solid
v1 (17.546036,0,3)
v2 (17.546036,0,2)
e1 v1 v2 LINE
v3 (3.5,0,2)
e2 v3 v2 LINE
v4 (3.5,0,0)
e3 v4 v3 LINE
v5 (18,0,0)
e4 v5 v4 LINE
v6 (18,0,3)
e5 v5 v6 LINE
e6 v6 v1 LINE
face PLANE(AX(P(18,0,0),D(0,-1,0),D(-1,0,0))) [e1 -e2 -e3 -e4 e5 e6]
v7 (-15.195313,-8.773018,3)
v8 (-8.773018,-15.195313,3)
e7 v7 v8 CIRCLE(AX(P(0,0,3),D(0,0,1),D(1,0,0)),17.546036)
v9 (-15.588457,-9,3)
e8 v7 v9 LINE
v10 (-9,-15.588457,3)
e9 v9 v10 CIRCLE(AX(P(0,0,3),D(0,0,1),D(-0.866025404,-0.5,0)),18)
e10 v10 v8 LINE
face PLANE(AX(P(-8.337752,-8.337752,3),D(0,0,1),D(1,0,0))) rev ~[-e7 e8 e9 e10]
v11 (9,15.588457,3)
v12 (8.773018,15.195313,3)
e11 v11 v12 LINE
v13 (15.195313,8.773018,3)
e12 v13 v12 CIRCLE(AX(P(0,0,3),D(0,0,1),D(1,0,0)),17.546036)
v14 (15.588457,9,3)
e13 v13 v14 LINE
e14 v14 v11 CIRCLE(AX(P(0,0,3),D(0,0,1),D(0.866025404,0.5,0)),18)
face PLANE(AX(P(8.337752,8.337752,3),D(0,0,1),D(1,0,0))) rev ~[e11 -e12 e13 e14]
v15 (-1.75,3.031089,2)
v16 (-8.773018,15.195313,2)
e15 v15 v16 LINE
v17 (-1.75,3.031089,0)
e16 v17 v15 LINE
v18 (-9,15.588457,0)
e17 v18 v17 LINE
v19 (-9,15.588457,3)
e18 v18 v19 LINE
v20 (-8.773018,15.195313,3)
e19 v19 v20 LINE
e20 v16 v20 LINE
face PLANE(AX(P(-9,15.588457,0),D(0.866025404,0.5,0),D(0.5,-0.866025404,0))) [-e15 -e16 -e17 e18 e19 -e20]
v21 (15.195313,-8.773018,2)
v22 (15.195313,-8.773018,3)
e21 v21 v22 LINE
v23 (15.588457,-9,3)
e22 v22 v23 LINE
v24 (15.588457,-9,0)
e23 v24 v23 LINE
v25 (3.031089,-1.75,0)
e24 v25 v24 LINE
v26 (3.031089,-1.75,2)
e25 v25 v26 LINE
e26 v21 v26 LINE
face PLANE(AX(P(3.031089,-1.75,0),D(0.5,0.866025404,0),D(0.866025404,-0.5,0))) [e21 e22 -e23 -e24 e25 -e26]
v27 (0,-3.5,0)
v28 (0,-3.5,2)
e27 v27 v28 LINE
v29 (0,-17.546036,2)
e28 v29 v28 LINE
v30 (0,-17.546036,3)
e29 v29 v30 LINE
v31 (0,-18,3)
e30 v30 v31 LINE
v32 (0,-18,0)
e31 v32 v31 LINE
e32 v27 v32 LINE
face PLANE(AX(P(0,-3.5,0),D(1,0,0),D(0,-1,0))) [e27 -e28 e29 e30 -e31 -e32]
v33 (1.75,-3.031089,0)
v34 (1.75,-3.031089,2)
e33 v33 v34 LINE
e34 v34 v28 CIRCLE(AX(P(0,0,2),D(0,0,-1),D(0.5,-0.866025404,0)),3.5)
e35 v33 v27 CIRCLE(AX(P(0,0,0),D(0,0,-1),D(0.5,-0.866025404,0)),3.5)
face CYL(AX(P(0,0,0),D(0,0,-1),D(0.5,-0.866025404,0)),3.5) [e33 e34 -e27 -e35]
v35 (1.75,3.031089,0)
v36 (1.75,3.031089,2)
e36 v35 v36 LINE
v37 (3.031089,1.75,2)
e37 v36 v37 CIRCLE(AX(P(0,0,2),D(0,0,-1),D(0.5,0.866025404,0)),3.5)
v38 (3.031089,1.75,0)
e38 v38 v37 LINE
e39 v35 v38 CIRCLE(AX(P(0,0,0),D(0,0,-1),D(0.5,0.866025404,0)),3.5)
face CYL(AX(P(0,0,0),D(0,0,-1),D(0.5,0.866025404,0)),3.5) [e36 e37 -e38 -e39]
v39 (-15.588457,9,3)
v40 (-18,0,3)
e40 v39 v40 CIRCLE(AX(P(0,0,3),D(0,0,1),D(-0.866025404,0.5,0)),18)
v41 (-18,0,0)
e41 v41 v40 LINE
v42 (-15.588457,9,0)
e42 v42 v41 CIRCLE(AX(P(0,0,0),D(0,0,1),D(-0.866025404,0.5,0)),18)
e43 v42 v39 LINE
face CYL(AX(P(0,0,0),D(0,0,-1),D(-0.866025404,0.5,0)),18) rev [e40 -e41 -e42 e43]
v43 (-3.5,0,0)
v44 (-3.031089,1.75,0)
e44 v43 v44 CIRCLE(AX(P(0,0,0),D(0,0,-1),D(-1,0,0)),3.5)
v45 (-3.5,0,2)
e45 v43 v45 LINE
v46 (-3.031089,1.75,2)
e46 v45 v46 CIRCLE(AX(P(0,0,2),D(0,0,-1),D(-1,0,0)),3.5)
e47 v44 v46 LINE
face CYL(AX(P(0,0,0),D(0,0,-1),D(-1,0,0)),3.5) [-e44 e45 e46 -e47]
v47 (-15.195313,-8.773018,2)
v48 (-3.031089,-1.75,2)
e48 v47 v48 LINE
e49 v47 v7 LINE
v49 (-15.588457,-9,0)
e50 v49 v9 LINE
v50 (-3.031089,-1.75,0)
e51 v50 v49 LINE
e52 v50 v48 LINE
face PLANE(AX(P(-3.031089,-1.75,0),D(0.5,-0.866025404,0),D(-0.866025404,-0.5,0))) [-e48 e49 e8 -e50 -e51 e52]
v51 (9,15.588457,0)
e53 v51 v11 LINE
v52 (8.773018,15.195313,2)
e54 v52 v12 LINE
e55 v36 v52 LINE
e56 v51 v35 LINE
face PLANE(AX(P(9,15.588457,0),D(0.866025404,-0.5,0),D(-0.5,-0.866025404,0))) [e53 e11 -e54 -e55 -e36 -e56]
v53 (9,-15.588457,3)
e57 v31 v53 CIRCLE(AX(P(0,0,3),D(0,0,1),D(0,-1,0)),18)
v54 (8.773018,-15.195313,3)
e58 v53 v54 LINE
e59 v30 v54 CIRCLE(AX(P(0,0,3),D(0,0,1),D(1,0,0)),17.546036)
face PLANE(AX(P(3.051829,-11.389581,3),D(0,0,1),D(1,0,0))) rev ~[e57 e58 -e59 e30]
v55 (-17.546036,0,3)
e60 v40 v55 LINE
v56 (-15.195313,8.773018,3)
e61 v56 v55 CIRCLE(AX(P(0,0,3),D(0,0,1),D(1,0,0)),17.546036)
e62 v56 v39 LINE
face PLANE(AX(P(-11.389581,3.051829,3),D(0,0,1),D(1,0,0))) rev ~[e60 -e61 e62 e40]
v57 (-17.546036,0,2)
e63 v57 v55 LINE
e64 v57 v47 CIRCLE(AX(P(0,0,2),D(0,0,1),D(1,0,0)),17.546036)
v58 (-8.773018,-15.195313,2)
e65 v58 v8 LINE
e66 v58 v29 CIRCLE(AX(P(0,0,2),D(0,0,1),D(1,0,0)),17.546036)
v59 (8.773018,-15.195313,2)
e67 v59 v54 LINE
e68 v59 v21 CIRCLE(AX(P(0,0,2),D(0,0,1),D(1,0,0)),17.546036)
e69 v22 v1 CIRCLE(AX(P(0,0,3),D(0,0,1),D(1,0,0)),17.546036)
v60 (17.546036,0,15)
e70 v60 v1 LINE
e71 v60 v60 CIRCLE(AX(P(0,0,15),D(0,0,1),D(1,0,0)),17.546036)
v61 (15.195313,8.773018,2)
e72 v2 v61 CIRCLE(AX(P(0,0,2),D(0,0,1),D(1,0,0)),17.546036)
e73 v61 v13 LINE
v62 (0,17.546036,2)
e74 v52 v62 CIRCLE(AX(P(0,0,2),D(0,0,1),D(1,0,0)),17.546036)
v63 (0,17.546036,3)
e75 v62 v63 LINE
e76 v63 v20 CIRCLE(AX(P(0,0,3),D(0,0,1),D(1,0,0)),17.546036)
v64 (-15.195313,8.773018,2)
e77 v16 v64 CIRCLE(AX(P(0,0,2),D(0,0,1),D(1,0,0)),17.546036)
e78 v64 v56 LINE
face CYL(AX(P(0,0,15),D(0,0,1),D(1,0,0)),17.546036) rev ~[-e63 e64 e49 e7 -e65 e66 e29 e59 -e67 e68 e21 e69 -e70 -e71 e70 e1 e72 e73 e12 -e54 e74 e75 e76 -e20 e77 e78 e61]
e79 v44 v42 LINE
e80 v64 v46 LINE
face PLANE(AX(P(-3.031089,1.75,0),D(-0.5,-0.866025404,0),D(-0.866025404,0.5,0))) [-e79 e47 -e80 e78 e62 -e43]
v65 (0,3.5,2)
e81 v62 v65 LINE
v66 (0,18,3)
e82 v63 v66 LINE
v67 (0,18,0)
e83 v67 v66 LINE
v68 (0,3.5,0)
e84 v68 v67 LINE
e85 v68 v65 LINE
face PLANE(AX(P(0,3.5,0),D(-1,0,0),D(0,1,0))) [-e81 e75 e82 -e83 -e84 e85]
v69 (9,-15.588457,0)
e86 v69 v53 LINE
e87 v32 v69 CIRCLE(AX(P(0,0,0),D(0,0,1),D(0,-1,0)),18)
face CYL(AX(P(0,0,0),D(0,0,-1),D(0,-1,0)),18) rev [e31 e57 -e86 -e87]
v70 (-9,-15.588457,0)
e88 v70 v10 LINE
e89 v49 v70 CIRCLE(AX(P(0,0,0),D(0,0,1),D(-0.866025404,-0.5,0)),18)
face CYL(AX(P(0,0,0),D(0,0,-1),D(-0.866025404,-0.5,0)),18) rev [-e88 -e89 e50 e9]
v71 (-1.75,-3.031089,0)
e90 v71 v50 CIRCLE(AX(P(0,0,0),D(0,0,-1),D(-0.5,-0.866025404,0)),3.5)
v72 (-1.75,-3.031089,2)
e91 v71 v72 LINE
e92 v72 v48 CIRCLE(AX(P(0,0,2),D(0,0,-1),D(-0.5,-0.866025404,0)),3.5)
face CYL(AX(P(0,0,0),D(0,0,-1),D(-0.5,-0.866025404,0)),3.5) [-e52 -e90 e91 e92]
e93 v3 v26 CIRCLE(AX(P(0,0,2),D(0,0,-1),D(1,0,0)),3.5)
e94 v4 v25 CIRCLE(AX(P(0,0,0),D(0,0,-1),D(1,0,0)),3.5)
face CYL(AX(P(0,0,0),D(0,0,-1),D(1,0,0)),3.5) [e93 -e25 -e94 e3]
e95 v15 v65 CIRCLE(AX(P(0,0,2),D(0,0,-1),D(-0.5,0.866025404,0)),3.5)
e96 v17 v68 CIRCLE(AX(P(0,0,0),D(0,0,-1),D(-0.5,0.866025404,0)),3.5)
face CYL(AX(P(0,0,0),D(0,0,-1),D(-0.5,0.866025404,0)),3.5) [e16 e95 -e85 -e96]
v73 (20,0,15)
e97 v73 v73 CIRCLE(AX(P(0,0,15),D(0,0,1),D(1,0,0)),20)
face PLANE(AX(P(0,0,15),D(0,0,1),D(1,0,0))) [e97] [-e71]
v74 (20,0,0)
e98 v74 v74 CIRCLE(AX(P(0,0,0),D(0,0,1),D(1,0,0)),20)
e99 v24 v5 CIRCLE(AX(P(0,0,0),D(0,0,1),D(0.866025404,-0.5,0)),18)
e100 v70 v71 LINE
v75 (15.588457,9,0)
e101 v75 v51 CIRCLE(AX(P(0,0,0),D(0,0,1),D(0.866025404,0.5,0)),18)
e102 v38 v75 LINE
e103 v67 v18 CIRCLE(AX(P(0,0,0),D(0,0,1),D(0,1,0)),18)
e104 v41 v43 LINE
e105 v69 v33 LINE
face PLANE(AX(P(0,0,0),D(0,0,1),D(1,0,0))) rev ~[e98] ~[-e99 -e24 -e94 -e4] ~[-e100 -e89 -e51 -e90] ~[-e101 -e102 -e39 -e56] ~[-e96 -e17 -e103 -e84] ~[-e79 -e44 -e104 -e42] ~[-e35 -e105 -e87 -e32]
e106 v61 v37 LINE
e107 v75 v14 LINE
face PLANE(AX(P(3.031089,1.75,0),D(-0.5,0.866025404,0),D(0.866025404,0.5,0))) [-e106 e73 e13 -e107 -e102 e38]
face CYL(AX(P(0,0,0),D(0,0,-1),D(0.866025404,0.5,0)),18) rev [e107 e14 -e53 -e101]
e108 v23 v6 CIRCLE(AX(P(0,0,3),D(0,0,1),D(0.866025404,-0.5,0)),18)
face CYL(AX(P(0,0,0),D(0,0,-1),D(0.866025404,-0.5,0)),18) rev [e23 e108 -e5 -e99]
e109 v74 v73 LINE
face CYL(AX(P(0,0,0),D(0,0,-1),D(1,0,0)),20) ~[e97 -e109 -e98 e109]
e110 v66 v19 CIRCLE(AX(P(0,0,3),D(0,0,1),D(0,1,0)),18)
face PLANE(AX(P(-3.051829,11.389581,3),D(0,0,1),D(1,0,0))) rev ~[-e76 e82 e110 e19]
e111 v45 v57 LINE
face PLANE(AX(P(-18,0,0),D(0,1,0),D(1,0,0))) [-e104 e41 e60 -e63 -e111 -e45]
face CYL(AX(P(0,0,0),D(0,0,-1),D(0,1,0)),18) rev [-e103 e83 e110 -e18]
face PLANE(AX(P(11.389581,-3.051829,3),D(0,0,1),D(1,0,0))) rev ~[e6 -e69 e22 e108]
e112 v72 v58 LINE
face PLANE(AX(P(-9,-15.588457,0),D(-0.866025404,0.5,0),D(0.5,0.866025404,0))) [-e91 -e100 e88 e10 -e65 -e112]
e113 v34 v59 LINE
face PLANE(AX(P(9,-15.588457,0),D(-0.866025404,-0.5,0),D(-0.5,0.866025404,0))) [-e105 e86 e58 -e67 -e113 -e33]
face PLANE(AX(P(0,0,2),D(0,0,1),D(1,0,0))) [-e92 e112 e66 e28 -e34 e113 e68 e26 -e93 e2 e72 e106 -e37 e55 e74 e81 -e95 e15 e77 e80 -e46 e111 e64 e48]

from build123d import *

# Parameters (mm, degrees)
F0_R     = 20
F1_DEPTH = 15
F2_R     = 17.5460358756
F4_DEPTH = 13
F6_DEPTH = 3


# Not quite as in the source:
# - a feature of the source that left no trace in its solid (it failed there, or was rolled back) is left out


with BuildPart() as f1:
    # F0 (on Top) → F1 (new body)
    with BuildSketch(Plane.XY):
        Circle(F0_R)
    extrude(amount=F1_DEPTH)

    # F2 (on face) → F4 (cut)
    with BuildSketch(Plane.XY.offset(15)):
        Circle(F2_R)
    extrude(amount=-F4_DEPTH, mode=Mode.SUBTRACT)

    # F5 (on face) → F6 (cut)
    with BuildSketch(Plane.XY):
        with BuildLine():
            ThreePointArc((0, -18), (4.6587428118, -17.3866648732), (9, -15.5884572681))
            Line((9, -15.5884572681), (1.75, -3.0310889132))
            ThreePointArc((1.75, -3.0310889132), (0.9058666579, -3.380740392), (0, -3.5))
            Line((0, -3.5), (0, -18))
        make_face()
        with BuildLine():
            ThreePointArc((15.5884572681, -9), (17.3866648732, -4.6587428118), (18, 0))
            Line((18, 0), (3.5, 0))
            ThreePointArc((3.5, 0), (3.380740392, -0.9058666579), (3.0310889132, -1.75))
            Line((3.0310889132, -1.75), (15.5884572681, -9))
        make_face()
        with BuildLine():
            Line((3.0310889132, 1.75), (15.5884572681, 9))
            ThreePointArc((15.5884572681, 9), (12.7279220614, 12.7279220614), (9, 15.5884572681))
            Line((9, 15.5884572681), (1.75, 3.0310889132))
            ThreePointArc((1.75, 3.0310889132), (2.4748737342, 2.4748737342), (3.0310889132, 1.75))
        make_face()
        with BuildLine():
            Line((0, 3.5), (0, 18))
            ThreePointArc((0, 18), (-4.6587428118, 17.3866648732), (-9, 15.5884572681))
            Line((-9, 15.5884572681), (-1.75, 3.0310889132))
            ThreePointArc((-1.75, 3.0310889132), (-0.9058666579, 3.380740392), (0, 3.5))
        make_face()
        with BuildLine():
            Line((-3.0310889132, 1.75), (-15.5884572681, 9))
            ThreePointArc((-15.5884572681, 9), (-17.3866648732, 4.6587428118), (-18, 0))
            Line((-18, 0), (-3.5, 0))
            ThreePointArc((-3.5, 0), (-3.380740392, 0.9058666579), (-3.0310889132, 1.75))
        make_face()
        with BuildLine():
            ThreePointArc((-15.5884572681, -9), (-12.7279220614, -12.7279220614), (-9, -15.5884572681))
            Line((-9, -15.5884572681), (-1.75, -3.0310889132))
            ThreePointArc((-1.75, -3.0310889132), (-2.4748737342, -2.4748737342), (-3.0310889132, -1.75))
            Line((-3.0310889132, -1.75), (-15.5884572681, -9))
        make_face()
    extrude(amount=F6_DEPTH, mode=Mode.SUBTRACT)


solid = f1.part
